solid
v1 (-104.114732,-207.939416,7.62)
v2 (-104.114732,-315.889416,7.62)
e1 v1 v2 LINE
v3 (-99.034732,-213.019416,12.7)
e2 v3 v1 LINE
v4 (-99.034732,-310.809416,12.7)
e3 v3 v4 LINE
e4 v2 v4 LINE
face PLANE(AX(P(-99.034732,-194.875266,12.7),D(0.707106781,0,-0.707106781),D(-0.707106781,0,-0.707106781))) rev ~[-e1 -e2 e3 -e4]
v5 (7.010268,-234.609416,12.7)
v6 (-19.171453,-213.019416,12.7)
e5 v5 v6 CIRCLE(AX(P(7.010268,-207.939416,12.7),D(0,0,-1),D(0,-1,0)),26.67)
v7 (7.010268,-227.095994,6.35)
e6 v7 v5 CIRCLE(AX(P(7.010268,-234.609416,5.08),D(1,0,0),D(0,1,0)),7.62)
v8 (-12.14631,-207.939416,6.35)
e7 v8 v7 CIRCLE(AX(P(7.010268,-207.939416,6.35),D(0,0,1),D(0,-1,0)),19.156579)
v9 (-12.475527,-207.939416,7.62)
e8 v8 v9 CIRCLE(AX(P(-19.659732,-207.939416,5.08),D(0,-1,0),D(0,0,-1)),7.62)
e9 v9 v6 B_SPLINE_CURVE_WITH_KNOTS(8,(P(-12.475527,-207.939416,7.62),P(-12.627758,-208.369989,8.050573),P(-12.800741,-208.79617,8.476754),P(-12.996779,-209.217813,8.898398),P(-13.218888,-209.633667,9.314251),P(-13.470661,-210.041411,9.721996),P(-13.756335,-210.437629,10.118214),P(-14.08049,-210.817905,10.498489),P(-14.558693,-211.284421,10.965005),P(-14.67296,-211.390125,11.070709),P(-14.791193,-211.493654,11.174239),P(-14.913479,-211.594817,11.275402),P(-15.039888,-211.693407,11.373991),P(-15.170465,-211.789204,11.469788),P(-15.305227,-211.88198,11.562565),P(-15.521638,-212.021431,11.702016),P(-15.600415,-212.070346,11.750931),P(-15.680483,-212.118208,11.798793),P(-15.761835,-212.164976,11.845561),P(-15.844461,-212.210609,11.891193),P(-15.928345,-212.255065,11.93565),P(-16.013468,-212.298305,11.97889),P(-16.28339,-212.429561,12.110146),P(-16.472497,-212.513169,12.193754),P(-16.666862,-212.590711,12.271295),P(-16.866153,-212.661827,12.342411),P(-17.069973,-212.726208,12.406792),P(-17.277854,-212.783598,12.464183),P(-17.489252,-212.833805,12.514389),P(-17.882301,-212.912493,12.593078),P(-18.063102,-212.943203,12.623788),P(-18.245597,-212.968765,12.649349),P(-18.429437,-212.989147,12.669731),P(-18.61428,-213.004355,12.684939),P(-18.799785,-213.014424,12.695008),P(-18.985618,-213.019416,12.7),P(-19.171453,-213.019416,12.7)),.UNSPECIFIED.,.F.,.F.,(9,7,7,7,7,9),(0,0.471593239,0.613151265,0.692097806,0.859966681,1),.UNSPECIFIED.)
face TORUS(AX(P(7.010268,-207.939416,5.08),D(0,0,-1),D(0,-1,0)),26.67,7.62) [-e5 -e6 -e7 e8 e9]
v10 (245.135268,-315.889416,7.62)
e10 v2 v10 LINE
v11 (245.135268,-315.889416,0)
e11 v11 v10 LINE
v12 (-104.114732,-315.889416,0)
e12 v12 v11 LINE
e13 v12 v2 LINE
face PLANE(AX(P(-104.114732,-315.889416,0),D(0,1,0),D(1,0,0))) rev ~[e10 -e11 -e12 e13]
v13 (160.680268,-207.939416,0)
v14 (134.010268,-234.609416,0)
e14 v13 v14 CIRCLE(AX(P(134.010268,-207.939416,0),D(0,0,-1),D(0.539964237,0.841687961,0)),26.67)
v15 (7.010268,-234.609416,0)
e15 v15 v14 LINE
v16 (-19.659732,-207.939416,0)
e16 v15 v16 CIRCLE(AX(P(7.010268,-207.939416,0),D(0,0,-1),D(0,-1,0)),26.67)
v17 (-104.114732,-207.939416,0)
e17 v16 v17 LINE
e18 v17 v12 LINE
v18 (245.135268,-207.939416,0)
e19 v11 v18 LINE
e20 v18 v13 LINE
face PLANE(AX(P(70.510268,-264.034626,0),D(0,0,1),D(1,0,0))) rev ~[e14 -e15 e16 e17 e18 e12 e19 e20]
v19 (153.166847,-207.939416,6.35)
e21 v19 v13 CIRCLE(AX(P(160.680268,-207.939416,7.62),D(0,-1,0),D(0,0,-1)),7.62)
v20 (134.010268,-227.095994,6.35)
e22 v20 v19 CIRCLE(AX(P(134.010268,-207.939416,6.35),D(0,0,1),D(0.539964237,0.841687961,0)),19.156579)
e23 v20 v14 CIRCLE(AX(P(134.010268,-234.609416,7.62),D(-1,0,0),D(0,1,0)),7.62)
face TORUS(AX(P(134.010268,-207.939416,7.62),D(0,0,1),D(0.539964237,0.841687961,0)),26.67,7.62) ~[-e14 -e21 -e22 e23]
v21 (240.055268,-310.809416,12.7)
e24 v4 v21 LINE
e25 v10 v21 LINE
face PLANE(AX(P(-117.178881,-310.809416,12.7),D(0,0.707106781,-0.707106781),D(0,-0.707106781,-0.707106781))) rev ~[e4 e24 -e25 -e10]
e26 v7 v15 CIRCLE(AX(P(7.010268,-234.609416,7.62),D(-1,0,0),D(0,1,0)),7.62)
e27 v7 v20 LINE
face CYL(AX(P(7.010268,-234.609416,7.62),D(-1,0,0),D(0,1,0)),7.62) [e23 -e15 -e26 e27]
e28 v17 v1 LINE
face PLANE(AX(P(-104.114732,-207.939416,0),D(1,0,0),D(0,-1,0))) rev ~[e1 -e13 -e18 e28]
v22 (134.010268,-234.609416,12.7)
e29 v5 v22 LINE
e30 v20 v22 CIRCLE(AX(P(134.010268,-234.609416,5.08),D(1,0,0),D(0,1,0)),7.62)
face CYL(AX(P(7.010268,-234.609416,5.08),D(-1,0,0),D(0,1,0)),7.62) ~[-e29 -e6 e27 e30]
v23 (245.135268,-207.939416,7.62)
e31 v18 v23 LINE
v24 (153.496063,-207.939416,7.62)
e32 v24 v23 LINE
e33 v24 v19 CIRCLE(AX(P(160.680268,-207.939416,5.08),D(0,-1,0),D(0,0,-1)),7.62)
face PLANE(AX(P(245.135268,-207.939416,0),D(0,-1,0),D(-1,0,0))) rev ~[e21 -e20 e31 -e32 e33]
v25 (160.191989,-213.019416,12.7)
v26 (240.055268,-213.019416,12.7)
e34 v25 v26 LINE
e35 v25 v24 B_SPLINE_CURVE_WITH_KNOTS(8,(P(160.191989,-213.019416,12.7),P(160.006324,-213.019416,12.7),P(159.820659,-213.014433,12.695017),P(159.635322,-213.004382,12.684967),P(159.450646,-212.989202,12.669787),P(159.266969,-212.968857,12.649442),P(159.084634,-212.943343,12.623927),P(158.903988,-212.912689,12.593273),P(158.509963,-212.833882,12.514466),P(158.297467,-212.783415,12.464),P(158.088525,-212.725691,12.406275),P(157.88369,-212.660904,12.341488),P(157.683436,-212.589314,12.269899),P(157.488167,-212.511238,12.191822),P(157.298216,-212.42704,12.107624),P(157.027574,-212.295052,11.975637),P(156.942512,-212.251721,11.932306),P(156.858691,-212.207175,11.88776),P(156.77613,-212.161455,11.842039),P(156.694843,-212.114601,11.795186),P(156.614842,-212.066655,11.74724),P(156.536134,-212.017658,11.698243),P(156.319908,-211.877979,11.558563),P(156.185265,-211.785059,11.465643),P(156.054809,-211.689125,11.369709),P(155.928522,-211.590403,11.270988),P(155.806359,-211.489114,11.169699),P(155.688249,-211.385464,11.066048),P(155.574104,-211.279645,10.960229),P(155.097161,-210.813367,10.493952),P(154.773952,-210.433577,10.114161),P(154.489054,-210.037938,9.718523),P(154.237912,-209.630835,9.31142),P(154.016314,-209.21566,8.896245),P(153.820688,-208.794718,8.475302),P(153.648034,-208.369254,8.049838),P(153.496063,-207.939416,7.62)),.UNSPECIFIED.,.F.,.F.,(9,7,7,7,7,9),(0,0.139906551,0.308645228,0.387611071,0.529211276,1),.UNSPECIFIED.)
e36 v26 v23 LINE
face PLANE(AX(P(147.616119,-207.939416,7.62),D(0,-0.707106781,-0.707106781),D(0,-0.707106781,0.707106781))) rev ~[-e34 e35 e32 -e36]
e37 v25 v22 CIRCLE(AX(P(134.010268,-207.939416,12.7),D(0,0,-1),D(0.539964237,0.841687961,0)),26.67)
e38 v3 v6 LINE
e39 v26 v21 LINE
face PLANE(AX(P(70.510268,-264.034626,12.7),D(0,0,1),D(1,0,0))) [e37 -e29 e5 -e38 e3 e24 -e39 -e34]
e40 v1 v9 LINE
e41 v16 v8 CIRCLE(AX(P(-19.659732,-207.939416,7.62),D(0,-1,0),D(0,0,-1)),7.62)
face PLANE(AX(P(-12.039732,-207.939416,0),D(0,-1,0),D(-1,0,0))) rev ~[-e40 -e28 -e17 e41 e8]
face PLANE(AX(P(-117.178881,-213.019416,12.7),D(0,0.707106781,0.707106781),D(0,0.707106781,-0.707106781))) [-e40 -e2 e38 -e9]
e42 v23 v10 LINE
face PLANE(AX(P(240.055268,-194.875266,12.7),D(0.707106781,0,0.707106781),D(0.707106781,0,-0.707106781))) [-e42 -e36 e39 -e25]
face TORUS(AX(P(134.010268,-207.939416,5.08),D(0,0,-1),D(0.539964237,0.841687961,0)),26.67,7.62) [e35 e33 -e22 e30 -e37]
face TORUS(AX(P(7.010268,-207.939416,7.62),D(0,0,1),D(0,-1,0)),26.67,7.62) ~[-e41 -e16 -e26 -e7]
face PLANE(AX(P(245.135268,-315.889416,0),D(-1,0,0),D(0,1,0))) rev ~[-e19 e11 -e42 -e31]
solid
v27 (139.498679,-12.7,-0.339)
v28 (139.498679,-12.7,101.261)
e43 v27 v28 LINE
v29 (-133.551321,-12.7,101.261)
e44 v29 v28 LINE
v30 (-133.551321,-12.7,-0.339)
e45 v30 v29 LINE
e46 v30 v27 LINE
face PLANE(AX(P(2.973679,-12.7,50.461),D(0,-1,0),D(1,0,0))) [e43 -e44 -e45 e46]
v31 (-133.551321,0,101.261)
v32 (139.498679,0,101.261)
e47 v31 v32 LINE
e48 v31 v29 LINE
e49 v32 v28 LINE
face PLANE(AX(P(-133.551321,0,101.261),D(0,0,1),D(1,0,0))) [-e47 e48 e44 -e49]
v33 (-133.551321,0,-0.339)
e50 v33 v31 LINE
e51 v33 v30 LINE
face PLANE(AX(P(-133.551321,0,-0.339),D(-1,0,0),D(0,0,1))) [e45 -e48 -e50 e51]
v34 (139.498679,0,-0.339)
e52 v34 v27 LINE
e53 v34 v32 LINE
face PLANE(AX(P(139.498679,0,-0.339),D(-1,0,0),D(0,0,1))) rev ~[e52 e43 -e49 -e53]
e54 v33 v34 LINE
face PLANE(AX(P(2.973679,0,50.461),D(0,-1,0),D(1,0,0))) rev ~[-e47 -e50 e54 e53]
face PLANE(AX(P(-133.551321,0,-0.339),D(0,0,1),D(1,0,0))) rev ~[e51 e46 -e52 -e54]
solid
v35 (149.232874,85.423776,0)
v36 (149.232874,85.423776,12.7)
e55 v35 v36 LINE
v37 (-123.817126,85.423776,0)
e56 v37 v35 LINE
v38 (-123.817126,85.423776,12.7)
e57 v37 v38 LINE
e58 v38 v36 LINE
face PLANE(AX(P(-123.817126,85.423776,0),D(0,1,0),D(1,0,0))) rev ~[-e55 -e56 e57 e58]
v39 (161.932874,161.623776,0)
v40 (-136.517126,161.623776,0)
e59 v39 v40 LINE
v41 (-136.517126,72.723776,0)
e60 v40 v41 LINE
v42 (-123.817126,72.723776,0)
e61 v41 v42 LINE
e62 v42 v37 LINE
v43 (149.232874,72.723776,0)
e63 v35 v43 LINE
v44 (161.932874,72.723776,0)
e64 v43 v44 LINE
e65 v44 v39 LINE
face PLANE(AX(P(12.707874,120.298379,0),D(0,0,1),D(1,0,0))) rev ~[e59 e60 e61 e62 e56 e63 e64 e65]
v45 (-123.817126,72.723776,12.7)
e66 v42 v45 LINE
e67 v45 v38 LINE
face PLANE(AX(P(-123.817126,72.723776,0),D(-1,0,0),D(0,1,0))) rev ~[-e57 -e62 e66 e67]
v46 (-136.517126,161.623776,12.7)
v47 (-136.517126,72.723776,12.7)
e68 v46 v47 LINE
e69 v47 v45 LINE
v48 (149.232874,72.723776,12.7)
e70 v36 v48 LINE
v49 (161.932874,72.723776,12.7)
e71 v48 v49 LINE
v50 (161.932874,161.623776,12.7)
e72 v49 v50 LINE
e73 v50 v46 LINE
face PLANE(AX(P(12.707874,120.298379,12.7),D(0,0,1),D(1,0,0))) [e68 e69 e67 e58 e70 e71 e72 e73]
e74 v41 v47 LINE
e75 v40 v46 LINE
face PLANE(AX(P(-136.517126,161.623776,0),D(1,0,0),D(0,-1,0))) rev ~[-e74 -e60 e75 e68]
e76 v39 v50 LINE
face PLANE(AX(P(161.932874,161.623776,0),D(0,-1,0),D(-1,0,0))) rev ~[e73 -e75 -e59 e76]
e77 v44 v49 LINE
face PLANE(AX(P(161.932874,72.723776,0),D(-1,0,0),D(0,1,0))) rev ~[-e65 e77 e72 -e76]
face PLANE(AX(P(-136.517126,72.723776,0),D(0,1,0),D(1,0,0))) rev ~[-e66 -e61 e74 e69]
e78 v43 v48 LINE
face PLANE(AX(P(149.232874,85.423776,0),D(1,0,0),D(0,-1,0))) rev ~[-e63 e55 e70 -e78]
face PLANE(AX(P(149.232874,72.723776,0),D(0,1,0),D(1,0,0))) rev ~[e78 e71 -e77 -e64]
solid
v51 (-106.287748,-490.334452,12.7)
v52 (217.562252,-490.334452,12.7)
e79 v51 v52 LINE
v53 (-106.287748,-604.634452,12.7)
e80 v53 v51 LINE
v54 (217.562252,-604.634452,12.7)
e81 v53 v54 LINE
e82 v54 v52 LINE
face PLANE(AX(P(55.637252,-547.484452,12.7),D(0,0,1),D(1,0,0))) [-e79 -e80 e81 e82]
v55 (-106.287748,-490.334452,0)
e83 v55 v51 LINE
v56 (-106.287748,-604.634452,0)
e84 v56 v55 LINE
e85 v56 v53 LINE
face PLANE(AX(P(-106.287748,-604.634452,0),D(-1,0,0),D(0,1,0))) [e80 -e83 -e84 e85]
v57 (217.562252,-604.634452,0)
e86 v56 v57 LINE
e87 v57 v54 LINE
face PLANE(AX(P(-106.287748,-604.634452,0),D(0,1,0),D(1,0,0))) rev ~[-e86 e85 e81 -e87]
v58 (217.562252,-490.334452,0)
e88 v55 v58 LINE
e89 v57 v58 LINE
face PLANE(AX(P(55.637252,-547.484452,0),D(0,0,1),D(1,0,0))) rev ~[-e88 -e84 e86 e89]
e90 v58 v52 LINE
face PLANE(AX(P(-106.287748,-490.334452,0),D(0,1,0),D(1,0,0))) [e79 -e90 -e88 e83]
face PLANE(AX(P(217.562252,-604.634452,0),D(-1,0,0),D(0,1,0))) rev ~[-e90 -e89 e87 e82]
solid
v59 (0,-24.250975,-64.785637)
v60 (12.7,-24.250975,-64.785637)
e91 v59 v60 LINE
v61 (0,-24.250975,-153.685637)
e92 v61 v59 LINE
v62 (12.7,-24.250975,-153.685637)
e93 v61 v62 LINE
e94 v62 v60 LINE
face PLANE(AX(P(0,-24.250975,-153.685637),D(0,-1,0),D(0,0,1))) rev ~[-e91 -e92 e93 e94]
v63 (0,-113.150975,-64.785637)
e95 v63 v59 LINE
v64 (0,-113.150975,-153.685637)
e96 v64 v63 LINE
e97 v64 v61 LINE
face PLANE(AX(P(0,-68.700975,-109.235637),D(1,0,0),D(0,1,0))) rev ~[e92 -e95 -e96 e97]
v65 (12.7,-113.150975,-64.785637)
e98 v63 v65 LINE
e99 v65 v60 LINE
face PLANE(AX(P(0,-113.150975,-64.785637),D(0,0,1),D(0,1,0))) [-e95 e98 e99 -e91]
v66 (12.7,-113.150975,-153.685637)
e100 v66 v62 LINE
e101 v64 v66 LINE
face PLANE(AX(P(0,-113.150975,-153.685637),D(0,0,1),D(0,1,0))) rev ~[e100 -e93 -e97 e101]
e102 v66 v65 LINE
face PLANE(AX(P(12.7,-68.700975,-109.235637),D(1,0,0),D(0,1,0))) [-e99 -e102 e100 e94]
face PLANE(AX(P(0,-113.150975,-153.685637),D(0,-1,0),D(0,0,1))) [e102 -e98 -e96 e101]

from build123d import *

# Parameters (mm, degrees)
F0_W         = 273.05
F0_H         = 101.6
F1_DEPTH     = 12.7
F3_DEPTH     = 12.7
F4_W         = 88.9
F4_H         = 88.9
F5_DEPTH     = 12.7
F7_DEPTH     = 12.7
F8_T1_DEPTH  = 127
F8_T4_ANGLE  = 147.318795695
F8_T6_ANGLE  = 147.318795695
F8_T8_ANGLE  = 147.318795695
F8_T10_ANGLE = 147.318795695
F9_T1_DEPTH  = 110.5832991577
F9_T3_DEPTH  = 134.0782991577
F9_T5_DEPTH  = 375.3782991577
F9_T7_DEPTH  = 110.5832991577
F10_W        = 323.85
F10_H        = 114.3
F11_DEPTH    = 12.7


# Not quite as in the source:
# - a fillet or chamfer that OpenCascade refuses, or shapes differently, is made with other operations: its cross-section is extruded or revolved along the edge and cut away or added


with BuildPart() as f1:
    # F0 (on Front) → F1 (new body)
    with BuildSketch(Plane.XZ):
        with Locations((2.9736794531, 50.4609997191)):
            Rectangle(F0_W, F0_H)
    extrude(amount=F1_DEPTH)


with BuildPart() as f3:
    # F2 (on Top) → F3 (new body)
    with BuildSketch(Plane.XY):
        Polygon((161.9328741789, 161.6237761021), (-136.5171258211, 161.6237761021), (-136.5171258211, 85.4237761021), (-136.5171258211, 72.7237761021), (-123.8171258211, 72.7237761021), (-123.8171258211, 85.4237761021), (149.2328741789, 85.4237761021), (149.2328741789, 72.7237761021), (161.9328741789, 72.7237761021), (161.9328741789, 85.4237761021), align=None)
    extrude(amount=F3_DEPTH)


with BuildPart() as f5:
    # F4 (on Right) → F5 (new body)
    with BuildSketch(Plane.YZ):
        with Locations((-68.700975406, -109.2356368899)):
            Rectangle(F4_W, F4_H)
    extrude(amount=F5_DEPTH)


with BuildPart() as f7:
    # F6 (on Top) → F7 (new body)
    with BuildSketch(Plane.XY):
        with BuildLine():
            Line((-12.0397317886, -207.9394155827), (-104.1147317886, -207.9394155827))
            Line((-104.1147317886, -207.9394155827), (-104.1147317886, -315.8894155827))
            Line((-104.1147317886, -315.8894155827), (245.1352682114, -315.8894155827))
            Line((245.1352682114, -315.8894155827), (245.1352682114, -207.9394155827))
            Line((245.1352682114, -207.9394155827), (153.0602682114, -207.9394155827))
            ThreePointArc((153.0602682114, -207.9394155827), (147.480652393, -221.4097997643), (134.0102682114, -226.9894155827))
            Line((134.0102682114, -226.9894155827), (7.0102682114, -226.9894155827))
            ThreePointArc((7.0102682114, -226.9894155827), (-6.4601159702, -221.4097997643), (-12.0397317886, -207.9394155827))
        make_face()
    extrude(amount=F7_DEPTH)

    # F8: fillet of radius 7.62 on 6 edges, made by hand

    # F8_s2 → F8_t1 (cut)
    with BuildSketch(Plane.YZ.offset(7.0102682114)):
        with BuildLine():
            ThreePointArc((-226.9894155827, 5.08), (-229.22126191, 10.4681536726), (-234.6094155827, 12.7))
            Line((-234.6094155827, 12.7), (-226.9894155827, 12.7))
            Line((-226.9894155827, 12.7), (-226.9894155827, 5.08))
        make_face()
        with BuildLine():
            ThreePointArc((-226.9894155827, 7.62), (-229.22126191, 2.2318463274), (-234.6094155827, 0))
            Line((-234.6094155827, 0), (-226.9894155827, 0))
            Line((-226.9894155827, 0), (-226.9894155827, 7.62))
        make_face()
    extrude(amount=F8_T1_DEPTH, mode=Mode.SUBTRACT)

    # F8_s3 → F8_t4 (revolve, cut)
    with BuildSketch(Plane(origin=(189.4426460264, -121.5322762083, 0), x_dir=(0, 0, 1), z_dir=(-0.8416879608, 0.5399642365, 0))):
        with BuildLine():
            ThreePointArc((7.62, -83.6093505), (2.2318463274, -81.3775041726), (0, -75.9893505))
            Line((0, -75.9893505), (0, -83.6093505))
            Line((0, -83.6093505), (7.62, -83.6093505))
        make_face()
    revolve(axis=Axis((134.0102682114, -207.9394155827, 0), (0, 0, -1)), revolution_arc=F8_T4_ANGLE, mode=Mode.SUBTRACT)

    # F8_s5 → F8_t6 (revolve, cut)
    with BuildSketch(Plane(origin=(189.4426460264, -121.5322762083, 0), x_dir=(0, 0, 1), z_dir=(-0.8416879608, 0.5399642365, 0))):
        with BuildLine():
            ThreePointArc((5.08, -83.6093505), (10.4681536726, -81.3775041726), (12.7, -75.9893505))
            Line((12.7, -75.9893505), (12.7, -83.6093505))
            Line((12.7, -83.6093505), (5.08, -83.6093505))
        make_face()
    revolve(axis=Axis((134.0102682114, -207.9394155827, 12.7), (0, 0, -1)), revolution_arc=F8_T6_ANGLE, mode=Mode.SUBTRACT)

    # F8_s7 → F8_t8 (revolve, cut)
    with BuildSketch(Plane.YZ.offset(7.0102682114)):
        with BuildLine():
            ThreePointArc((-226.9894155827, 7.62), (-229.22126191, 2.2318463274), (-234.6094155827, 0))
            Line((-234.6094155827, 0), (-226.9894155827, 0))
            Line((-226.9894155827, 0), (-226.9894155827, 7.62))
        make_face()
    revolve(axis=Axis((7.0102682114, -207.9394155827, 0), (0, 0, -1)), revolution_arc=F8_T8_ANGLE, mode=Mode.SUBTRACT)

    # F8_s9 → F8_t10 (revolve, cut)
    with BuildSketch(Plane.YZ.offset(7.0102682114)):
        with BuildLine():
            ThreePointArc((-226.9894155827, 5.08), (-229.22126191, 10.4681536726), (-234.6094155827, 12.7))
            Line((-234.6094155827, 12.7), (-226.9894155827, 12.7))
            Line((-226.9894155827, 12.7), (-226.9894155827, 5.08))
        make_face()
    revolve(axis=Axis((7.0102682114, -207.9394155827, 12.7), (0, 0, -1)), revolution_arc=F8_T10_ANGLE, mode=Mode.SUBTRACT)

    # F9: chamfer of 5.08 on 5 edges, made by hand

    # F9_s2 → F9_t1 (cut)
    with BuildSketch(Plane.YZ.offset(-117.1788813675)):
        Polygon((-213.0194155827, 12.7), (-207.9394155827, 7.62), (-207.9394155827, 12.7), align=None)
    extrude(amount=F9_T1_DEPTH, mode=Mode.SUBTRACT)

    # F9_s4 → F9_t3 (cut)
    with BuildSketch(Plane.XZ.offset(194.8752660038)):
        Polygon((-99.0347317886, 12.7), (-104.1147317886, 7.62), (-104.1147317886, 12.7), align=None)
        Polygon((240.0552682114, 12.7), (245.1352682114, 7.62), (245.1352682114, 12.7), align=None)
    extrude(amount=F9_T3_DEPTH, mode=Mode.SUBTRACT)

    # F9_s6 → F9_t5 (cut)
    with BuildSketch(Plane.YZ.offset(-117.1788813675)):
        Polygon((-310.8094155827, 12.7), (-315.8894155827, 7.62), (-315.8894155827, 12.7), align=None)
    extrude(amount=F9_T5_DEPTH, mode=Mode.SUBTRACT)

    # F9_s8 → F9_t7 (cut)
    with BuildSketch(Plane.YZ.offset(147.6161186325)):
        Polygon((-207.9394155827, 7.62), (-213.0194155827, 12.7), (-207.9394155827, 12.7), align=None)
    extrude(amount=F9_T7_DEPTH, mode=Mode.SUBTRACT)


with BuildPart() as f11:
    # F10 (on Top) → F11 (new body)
    with BuildSketch(Plane.XY):
        with Locations((55.6372515857, -547.4844523445)):
            Rectangle(F10_W, F10_H)
    extrude(amount=F11_DEPTH)


solid = Compound([f1.part, f3.part, f5.part, f7.part, f11.part])
